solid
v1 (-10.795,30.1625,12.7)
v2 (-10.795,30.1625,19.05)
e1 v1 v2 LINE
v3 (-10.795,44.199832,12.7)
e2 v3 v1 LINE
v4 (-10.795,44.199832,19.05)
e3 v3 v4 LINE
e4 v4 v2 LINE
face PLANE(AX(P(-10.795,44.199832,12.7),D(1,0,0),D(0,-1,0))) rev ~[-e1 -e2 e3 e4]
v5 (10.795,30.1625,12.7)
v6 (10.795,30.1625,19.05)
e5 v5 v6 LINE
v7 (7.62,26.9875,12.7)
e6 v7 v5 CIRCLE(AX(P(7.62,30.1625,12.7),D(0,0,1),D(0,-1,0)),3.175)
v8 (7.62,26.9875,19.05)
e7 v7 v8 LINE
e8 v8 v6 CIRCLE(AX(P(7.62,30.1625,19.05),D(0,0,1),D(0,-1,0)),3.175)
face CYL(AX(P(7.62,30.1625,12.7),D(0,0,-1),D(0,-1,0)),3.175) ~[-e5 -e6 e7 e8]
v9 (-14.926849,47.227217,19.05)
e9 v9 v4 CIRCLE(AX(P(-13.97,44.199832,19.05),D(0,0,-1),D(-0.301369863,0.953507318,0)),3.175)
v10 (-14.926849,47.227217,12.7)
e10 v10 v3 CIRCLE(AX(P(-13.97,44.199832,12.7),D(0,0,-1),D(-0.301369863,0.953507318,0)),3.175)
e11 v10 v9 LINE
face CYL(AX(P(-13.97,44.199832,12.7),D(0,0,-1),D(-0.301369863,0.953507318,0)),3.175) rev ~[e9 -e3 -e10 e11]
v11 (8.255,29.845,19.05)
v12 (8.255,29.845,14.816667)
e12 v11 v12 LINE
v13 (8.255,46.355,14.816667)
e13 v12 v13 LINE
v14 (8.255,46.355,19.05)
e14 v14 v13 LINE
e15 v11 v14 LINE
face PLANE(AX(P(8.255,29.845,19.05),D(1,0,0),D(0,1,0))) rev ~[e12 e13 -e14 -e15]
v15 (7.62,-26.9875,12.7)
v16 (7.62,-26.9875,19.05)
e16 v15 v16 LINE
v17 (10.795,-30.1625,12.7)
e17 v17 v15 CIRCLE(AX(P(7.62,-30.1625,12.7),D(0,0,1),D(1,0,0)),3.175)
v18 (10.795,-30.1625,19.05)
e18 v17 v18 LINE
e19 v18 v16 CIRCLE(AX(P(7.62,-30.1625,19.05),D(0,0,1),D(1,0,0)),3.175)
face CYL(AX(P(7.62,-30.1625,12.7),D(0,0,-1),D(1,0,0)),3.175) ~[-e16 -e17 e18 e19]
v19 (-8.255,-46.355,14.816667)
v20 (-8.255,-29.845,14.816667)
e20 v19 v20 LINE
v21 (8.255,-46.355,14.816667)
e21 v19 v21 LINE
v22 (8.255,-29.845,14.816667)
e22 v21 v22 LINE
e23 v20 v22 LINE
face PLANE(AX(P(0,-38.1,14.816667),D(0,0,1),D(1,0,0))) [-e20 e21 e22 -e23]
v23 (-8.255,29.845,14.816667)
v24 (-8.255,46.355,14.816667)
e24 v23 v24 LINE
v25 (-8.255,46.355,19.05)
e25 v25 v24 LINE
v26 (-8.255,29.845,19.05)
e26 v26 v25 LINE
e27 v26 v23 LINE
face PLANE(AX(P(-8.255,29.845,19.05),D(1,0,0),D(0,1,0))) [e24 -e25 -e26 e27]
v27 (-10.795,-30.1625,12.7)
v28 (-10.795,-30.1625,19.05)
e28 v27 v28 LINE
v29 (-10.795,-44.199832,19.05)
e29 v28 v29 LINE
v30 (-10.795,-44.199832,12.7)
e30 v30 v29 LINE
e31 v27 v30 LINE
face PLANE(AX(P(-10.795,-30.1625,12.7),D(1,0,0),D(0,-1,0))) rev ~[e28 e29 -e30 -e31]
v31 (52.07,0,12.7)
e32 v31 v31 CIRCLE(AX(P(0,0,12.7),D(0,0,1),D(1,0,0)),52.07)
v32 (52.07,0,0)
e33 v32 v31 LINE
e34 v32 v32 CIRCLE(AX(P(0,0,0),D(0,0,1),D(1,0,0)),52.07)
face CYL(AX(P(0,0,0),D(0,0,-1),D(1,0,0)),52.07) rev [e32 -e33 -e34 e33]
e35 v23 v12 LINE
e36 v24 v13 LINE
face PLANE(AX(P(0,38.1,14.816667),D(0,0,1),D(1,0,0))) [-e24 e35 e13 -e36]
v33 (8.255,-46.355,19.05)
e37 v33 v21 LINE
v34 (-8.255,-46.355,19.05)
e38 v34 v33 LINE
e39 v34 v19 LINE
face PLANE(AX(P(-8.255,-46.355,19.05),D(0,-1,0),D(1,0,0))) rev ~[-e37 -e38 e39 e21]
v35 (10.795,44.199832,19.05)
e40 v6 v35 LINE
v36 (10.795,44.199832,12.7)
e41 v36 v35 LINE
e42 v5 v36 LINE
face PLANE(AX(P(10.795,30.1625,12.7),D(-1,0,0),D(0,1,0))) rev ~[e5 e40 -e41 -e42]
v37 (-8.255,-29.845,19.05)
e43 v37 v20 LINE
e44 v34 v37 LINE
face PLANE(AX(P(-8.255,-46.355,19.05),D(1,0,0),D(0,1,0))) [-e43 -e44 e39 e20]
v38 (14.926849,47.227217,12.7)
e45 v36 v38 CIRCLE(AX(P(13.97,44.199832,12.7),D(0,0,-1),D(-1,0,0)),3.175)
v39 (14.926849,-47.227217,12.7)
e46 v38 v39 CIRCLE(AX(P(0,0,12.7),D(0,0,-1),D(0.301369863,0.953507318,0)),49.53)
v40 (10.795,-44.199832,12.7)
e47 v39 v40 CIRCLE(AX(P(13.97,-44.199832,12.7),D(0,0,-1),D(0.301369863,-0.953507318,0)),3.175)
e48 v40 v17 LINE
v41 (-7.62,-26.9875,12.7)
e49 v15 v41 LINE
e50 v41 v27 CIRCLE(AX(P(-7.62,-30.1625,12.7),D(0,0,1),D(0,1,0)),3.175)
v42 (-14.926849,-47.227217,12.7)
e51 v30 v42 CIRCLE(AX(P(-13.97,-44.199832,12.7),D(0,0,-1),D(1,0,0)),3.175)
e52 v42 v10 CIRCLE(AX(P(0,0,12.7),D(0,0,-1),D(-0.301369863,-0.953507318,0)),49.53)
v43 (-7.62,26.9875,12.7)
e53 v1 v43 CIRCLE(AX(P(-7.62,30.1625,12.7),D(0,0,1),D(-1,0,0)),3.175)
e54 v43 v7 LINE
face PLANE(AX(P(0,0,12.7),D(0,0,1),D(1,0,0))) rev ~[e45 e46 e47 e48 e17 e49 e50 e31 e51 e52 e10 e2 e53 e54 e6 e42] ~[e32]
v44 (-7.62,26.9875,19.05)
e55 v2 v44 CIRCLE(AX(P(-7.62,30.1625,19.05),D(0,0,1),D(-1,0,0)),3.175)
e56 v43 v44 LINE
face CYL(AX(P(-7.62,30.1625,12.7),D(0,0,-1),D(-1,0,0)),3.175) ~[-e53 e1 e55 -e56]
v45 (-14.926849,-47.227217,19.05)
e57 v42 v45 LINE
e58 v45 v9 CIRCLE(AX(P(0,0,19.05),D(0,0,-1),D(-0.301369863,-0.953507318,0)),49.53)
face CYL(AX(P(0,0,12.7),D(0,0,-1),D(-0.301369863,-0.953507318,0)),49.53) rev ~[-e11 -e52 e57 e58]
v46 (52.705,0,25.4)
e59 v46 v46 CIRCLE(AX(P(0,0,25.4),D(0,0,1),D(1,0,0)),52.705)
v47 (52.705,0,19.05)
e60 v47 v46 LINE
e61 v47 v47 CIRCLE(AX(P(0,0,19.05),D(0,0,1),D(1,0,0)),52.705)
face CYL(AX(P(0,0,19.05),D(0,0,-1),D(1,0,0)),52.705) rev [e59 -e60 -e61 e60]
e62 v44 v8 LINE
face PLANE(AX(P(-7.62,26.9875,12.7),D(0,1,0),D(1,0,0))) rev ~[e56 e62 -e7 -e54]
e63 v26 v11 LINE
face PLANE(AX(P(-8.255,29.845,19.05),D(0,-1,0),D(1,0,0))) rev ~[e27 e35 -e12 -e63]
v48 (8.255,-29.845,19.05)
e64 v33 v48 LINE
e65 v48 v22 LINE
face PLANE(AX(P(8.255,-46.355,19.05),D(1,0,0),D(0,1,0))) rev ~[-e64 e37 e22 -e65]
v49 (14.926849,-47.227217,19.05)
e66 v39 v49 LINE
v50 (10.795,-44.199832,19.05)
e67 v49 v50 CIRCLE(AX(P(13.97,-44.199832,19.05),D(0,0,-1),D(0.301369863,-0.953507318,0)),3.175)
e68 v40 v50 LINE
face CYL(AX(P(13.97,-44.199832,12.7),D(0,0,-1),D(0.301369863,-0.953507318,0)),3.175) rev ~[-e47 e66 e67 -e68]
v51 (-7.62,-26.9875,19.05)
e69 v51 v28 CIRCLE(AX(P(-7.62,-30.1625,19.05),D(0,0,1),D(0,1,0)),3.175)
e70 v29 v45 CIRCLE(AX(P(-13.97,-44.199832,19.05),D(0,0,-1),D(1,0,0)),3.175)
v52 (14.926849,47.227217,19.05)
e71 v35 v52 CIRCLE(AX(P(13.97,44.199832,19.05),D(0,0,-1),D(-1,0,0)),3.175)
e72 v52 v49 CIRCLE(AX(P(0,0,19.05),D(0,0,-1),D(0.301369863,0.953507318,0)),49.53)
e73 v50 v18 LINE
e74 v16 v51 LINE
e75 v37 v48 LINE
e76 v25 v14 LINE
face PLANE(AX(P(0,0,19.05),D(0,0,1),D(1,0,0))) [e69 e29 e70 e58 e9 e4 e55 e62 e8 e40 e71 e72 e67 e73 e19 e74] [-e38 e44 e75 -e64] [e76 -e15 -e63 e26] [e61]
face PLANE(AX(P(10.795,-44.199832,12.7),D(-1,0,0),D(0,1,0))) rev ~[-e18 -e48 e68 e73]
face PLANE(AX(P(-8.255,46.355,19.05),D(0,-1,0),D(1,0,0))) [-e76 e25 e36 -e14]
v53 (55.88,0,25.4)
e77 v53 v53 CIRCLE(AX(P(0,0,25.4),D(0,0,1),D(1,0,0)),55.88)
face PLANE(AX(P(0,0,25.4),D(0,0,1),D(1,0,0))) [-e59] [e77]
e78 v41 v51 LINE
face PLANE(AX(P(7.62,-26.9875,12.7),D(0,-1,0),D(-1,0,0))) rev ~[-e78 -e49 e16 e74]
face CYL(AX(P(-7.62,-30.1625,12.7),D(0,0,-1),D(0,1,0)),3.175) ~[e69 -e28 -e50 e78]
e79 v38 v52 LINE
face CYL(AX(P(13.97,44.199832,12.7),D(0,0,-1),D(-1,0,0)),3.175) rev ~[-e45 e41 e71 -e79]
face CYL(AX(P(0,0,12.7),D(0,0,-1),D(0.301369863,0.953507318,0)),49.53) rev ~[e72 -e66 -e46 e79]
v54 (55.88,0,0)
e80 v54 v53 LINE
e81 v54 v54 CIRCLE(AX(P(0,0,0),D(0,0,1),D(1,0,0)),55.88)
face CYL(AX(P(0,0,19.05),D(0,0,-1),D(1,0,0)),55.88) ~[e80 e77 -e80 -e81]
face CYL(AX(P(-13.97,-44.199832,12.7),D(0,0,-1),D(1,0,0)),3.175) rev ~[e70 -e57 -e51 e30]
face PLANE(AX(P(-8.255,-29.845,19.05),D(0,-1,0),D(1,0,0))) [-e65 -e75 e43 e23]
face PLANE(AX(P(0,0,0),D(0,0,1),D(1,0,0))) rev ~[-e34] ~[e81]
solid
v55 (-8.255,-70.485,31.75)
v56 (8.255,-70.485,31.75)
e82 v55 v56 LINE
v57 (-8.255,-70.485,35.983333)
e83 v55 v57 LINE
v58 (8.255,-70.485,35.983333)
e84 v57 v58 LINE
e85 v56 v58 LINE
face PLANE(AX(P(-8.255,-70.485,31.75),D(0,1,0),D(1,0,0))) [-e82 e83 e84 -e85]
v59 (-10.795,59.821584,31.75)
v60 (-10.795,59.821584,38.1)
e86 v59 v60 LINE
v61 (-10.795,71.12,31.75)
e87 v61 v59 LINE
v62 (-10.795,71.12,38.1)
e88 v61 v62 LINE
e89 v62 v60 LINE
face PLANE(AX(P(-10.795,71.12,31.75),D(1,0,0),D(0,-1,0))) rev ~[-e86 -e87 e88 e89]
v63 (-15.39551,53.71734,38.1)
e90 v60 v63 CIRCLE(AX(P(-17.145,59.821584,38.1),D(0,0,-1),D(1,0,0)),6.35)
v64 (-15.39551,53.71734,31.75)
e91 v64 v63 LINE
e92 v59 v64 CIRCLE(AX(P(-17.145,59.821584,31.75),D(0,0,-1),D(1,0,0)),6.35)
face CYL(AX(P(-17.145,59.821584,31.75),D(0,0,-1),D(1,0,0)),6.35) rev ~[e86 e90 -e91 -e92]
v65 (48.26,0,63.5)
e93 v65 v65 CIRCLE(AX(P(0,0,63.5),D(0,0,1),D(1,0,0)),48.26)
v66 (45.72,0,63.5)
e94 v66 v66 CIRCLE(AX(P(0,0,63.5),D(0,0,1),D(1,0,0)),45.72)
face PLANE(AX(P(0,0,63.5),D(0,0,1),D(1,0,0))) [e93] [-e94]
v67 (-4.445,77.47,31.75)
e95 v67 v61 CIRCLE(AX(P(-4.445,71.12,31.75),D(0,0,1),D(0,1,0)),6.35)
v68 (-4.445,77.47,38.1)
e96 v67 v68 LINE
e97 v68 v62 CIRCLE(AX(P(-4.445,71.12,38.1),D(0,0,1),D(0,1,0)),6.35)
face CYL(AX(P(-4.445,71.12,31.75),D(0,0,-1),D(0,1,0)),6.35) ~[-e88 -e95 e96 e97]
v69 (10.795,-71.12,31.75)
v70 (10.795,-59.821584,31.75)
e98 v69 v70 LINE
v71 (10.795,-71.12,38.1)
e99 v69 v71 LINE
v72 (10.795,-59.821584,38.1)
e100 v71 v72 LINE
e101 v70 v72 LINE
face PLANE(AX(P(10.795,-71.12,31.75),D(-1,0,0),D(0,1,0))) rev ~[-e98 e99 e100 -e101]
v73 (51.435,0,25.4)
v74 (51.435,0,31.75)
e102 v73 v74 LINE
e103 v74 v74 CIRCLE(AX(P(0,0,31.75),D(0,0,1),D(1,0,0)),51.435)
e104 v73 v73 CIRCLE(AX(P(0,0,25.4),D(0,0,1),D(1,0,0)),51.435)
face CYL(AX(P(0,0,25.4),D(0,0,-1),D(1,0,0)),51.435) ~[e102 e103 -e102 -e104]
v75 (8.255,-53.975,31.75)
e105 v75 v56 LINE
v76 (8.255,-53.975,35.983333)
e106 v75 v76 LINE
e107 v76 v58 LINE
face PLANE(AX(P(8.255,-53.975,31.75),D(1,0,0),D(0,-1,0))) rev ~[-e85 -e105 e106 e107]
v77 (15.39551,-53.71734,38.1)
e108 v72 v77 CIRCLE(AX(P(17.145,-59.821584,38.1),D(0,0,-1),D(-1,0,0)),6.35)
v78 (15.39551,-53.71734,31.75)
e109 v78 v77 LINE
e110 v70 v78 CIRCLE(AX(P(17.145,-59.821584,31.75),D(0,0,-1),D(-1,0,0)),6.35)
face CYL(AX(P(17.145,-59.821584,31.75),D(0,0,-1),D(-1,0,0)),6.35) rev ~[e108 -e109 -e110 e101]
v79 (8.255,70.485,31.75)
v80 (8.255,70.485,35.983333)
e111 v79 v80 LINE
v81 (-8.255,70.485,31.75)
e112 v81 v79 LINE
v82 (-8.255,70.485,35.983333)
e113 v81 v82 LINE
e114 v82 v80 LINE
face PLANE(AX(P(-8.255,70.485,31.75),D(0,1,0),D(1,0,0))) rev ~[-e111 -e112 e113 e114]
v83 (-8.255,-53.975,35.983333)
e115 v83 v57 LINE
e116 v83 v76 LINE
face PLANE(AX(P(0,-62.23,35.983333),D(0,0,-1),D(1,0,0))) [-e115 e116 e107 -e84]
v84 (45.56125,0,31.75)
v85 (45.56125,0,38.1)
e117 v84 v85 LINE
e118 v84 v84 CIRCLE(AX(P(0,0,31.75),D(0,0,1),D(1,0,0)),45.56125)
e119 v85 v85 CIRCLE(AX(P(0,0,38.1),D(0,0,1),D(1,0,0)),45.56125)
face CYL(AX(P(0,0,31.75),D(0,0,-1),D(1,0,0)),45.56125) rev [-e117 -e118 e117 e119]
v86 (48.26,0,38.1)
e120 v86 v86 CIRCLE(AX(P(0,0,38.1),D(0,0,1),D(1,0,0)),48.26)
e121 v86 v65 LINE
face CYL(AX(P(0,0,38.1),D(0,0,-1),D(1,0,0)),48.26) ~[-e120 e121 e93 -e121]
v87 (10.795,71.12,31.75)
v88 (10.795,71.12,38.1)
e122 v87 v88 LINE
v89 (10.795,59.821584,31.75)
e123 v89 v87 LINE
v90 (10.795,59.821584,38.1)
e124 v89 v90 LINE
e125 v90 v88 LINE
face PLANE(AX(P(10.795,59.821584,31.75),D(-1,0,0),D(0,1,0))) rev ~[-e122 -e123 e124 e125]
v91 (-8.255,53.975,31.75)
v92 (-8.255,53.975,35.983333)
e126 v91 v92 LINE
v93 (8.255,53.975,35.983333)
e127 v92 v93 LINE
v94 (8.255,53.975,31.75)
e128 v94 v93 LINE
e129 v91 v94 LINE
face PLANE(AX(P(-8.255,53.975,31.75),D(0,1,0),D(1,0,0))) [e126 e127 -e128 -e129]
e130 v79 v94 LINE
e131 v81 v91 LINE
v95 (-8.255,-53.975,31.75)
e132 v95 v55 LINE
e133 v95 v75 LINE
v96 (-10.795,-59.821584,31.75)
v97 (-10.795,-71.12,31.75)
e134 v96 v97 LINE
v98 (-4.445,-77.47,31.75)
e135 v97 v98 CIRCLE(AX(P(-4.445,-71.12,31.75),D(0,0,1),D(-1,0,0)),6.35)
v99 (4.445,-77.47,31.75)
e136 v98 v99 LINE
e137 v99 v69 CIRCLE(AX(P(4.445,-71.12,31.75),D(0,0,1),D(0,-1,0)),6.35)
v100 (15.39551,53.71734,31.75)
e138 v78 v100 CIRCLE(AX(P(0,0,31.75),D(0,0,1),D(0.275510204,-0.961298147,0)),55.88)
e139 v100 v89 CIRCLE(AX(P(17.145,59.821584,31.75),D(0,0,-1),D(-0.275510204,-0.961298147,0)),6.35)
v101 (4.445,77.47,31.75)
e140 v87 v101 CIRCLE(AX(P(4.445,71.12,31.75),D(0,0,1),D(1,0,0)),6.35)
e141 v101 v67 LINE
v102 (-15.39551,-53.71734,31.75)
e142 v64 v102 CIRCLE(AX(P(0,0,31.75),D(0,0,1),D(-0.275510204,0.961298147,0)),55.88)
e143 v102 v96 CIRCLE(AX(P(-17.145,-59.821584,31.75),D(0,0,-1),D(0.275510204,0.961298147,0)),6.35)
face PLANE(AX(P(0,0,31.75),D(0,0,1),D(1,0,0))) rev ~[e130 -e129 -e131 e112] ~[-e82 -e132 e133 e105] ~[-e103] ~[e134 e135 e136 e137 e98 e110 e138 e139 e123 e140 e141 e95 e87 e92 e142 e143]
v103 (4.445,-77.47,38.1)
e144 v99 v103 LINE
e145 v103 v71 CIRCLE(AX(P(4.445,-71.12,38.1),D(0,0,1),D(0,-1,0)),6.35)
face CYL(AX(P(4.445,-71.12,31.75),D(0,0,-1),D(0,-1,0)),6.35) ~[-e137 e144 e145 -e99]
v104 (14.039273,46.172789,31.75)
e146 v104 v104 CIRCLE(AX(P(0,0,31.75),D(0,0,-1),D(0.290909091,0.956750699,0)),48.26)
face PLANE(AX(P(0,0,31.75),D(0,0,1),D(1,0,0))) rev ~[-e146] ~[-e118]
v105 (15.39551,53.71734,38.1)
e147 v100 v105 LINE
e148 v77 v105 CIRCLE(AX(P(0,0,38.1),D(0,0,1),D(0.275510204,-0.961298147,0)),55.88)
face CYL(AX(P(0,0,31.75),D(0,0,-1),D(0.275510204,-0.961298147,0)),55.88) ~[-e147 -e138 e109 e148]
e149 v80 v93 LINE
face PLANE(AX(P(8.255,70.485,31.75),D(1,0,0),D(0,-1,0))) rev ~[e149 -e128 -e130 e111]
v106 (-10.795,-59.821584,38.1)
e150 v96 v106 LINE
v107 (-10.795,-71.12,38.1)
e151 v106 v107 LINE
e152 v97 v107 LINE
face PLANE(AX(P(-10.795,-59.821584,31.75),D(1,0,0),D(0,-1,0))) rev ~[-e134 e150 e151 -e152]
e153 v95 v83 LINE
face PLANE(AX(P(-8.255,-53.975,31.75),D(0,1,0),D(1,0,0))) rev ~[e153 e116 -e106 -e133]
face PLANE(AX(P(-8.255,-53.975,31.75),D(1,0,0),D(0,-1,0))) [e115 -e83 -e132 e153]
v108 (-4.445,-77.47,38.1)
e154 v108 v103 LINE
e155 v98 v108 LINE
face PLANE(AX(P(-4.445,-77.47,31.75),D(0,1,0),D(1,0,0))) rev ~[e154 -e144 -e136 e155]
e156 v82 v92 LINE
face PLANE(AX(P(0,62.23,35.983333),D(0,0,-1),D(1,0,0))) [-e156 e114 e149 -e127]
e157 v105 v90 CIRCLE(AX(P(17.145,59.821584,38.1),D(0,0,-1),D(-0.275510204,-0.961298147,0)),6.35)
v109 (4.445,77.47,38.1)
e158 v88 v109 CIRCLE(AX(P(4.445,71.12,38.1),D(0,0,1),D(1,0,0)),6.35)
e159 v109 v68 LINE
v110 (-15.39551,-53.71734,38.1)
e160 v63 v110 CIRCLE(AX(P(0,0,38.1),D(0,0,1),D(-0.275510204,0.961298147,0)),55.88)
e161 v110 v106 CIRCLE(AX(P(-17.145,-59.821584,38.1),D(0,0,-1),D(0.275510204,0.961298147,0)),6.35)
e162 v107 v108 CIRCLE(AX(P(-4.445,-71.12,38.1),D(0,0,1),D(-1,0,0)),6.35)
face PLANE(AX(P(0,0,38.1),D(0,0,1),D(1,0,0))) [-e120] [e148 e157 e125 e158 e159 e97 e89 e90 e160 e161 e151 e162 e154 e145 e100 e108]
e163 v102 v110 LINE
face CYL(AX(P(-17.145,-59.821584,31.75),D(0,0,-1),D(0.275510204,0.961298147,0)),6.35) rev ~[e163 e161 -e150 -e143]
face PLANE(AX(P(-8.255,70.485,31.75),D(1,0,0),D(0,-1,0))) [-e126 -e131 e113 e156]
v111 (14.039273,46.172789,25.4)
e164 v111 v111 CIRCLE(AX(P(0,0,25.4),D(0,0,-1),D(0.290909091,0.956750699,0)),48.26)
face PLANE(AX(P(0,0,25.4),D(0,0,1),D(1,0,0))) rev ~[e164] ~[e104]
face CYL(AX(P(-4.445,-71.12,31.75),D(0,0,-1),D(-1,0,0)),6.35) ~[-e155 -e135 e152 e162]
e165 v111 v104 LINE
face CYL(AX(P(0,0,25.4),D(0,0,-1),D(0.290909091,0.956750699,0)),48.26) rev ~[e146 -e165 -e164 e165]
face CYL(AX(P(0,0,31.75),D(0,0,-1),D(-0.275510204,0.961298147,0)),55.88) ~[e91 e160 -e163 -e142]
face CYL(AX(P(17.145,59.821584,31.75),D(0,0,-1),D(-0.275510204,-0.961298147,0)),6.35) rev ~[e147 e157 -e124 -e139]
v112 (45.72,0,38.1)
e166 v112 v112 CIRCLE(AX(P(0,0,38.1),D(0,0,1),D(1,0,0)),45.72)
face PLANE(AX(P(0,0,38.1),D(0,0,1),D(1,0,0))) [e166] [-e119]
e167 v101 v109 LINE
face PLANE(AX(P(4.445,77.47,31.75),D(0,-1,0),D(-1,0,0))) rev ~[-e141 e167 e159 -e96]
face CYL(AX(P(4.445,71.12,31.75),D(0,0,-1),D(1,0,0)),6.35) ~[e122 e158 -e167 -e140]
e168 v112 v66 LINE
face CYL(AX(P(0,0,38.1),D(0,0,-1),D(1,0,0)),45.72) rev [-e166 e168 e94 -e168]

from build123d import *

# Parameters (mm, degrees)
F0_R      = 55.88
F0_R_2    = 52.07
F1_DEPTH  = 12.7
F2_R      = 55.88
F3_DEPTH  = 6.35
F4_R      = 55.88
F4_R_2    = 52.705
F5_DEPTH  = 6.35
F6_W      = 16.51
F6_H      = 16.51
F7_DEPTH  = 4.2333333333
F8_R      = 51.435
F9_DEPTH  = 6.35
F10_R     = 45.56125
F11_DEPTH = 6.35
F12_R     = 48.26
F12_R_2   = 45.72
F13_DEPTH = 25.4
F14_W     = 16.51
F14_H     = 16.51
F15_DEPTH = 4.2333333333


# Not quite as in the source:
# - a length typed as a fraction of an inch, garbled in the dataset ("3 / 203.2 mm" for 3/8 in), is restored


with BuildPart() as f1:
    # F0 (on Top) → F1 (new body)
    with BuildSketch(Plane.XY):
        Circle(F0_R)
        Circle(F0_R_2, mode=Mode.SUBTRACT)
    extrude(amount=F1_DEPTH)

    # F2 (on face) → F3 (join)
    with BuildSketch(Plane.XY.offset(12.7)):
        Circle(F2_R)
        with BuildLine():
            ThreePointArc((-14.9268493151, -47.2272174654), (-49.53, 0), (-14.9268493151, 47.2272174654))
            ThreePointArc((-14.9268493151, 47.2272174654), (-12.09348349, 46.7609468758), (-10.795, 44.1998317304))
            Line((-10.795, 44.1998317304), (-10.795, 30.1625))
            ThreePointArc((-10.795, 30.1625), (-9.8650640303, 27.9174359697), (-7.62, 26.9875))
            Line((-7.62, 26.9875), (7.62, 26.9875))
            ThreePointArc((7.62, 26.9875), (9.8650640303, 27.9174359697), (10.795, 30.1625))
            Line((10.795, 30.1625), (10.795, 44.1998317304))
            ThreePointArc((10.795, 44.1998317304), (12.09348349, 46.7609468758), (14.9268493151, 47.2272174654))
            ThreePointArc((14.9268493151, 47.2272174654), (49.53, 0), (14.9268493151, -47.2272174654))
            ThreePointArc((14.9268493151, -47.2272174654), (12.09348349, -46.7609468758), (10.795, -44.1998317304))
            Line((10.795, -44.1998317304), (10.795, -30.1625))
            ThreePointArc((10.795, -30.1625), (9.8650640303, -27.9174359697), (7.62, -26.9875))
            Line((7.62, -26.9875), (-7.62, -26.9875))
            ThreePointArc((-7.62, -26.9875), (-9.8650640303, -27.9174359697), (-10.795, -30.1625))
            Line((-10.795, -30.1625), (-10.795, -44.1998317304))
            ThreePointArc((-10.795, -44.1998317304), (-12.09348349, -46.7609468758), (-14.9268493151, -47.2272174654))
        make_face(mode=Mode.SUBTRACT)
    extrude(amount=F3_DEPTH)

    # F4 (on face) → F5 (join)
    with BuildSketch(Plane.XY.offset(19.05)):
        Circle(F4_R)
        Circle(F4_R_2, mode=Mode.SUBTRACT)
    extrude(amount=F5_DEPTH)

    # F6 (on face) → F7 (cut)
    with BuildSketch(Plane.XY.offset(19.05)):
        with Locations((0, 38.1)):
            Rectangle(F6_W, F6_H)
        with Locations((0, -38.1)):
            Rectangle(F6_W, F6_H)
    extrude(amount=-F7_DEPTH, mode=Mode.SUBTRACT)


with BuildPart() as f9:
    # F8 (on face) → F9 (new body)
    with BuildSketch(Plane.XY.offset(25.4)):
        Circle(F8_R)
        with BuildLine():
            ThreePointArc((15.905917603, -45.5634654653), (-48.2500123369, -0.9817889236), (14.0392727273, 46.1727887537))
            ThreePointArc((14.0392727273, 46.1727887537), (48.2500123369, 0.9817889236), (15.905917603, -45.5634654653))
        make_face(mode=Mode.SUBTRACT)
    extrude(amount=F9_DEPTH)

    # F10 (on face) → F11 (join)
    with BuildSketch(Plane.XY.offset(31.75)):
        with BuildLine():
            ThreePointArc((-10.795, 59.8215836885), (-12.0739172653, 55.9997228985), (-15.3955102041, 53.717340455))
            ThreePointArc((-15.3955102041, 53.717340455), (-55.88, 0), (-15.3955102041, -53.717340455))
            ThreePointArc((-15.3955102041, -53.717340455), (-12.0739172653, -55.9997228985), (-10.795, -59.8215836885))
            Line((-10.795, -59.8215836885), (-10.795, -71.12))
            ThreePointArc((-10.795, -71.12), (-8.9351280605, -75.6101280605), (-4.445, -77.47))
            Line((-4.445, -77.47), (4.445, -77.47))
            ThreePointArc((4.445, -77.47), (8.9351280605, -75.6101280605), (10.795, -71.12))
            Line((10.795, -71.12), (10.795, -59.8215836885))
            ThreePointArc((10.795, -59.8215836885), (12.0739172653, -55.9997228985), (15.3955102041, -53.717340455))
            ThreePointArc((15.3955102041, -53.717340455), (55.88, 0), (15.3955102041, 53.717340455))
            ThreePointArc((15.3955102041, 53.717340455), (12.0739172653, 55.9997228985), (10.795, 59.8215836885))
            Line((10.795, 59.8215836885), (10.795, 71.12))
            ThreePointArc((10.795, 71.12), (8.9351280605, 75.6101280605), (4.445, 77.47))
            Line((4.445, 77.47), (-4.445, 77.47))
            ThreePointArc((-4.445, 77.47), (-8.9351280605, 75.6101280605), (-10.795, 71.12))
            Line((-10.795, 71.12), (-10.795, 59.8215836885))
        make_face()
        Circle(F10_R, mode=Mode.SUBTRACT)
    extrude(amount=F11_DEPTH)

    # F12 (on face) → F13 (join)
    with BuildSketch(Plane.XY.offset(38.1)):
        Circle(F12_R)
        Circle(F12_R_2, mode=Mode.SUBTRACT)
    extrude(amount=F13_DEPTH)

    # F14 (on face) → F15 (cut)
    with BuildSketch(Plane(origin=(0, 0, 31.75), x_dir=(1, 0, 0), z_dir=(0, 0, -1))):
        with Locations((0, -62.23)):
            Rectangle(F14_W, F14_H)
        with Locations((0, 62.23)):
            Rectangle(F14_W, F14_H)
    extrude(amount=-F15_DEPTH, mode=Mode.SUBTRACT)


solid = Compound([f1.part, f9.part])
